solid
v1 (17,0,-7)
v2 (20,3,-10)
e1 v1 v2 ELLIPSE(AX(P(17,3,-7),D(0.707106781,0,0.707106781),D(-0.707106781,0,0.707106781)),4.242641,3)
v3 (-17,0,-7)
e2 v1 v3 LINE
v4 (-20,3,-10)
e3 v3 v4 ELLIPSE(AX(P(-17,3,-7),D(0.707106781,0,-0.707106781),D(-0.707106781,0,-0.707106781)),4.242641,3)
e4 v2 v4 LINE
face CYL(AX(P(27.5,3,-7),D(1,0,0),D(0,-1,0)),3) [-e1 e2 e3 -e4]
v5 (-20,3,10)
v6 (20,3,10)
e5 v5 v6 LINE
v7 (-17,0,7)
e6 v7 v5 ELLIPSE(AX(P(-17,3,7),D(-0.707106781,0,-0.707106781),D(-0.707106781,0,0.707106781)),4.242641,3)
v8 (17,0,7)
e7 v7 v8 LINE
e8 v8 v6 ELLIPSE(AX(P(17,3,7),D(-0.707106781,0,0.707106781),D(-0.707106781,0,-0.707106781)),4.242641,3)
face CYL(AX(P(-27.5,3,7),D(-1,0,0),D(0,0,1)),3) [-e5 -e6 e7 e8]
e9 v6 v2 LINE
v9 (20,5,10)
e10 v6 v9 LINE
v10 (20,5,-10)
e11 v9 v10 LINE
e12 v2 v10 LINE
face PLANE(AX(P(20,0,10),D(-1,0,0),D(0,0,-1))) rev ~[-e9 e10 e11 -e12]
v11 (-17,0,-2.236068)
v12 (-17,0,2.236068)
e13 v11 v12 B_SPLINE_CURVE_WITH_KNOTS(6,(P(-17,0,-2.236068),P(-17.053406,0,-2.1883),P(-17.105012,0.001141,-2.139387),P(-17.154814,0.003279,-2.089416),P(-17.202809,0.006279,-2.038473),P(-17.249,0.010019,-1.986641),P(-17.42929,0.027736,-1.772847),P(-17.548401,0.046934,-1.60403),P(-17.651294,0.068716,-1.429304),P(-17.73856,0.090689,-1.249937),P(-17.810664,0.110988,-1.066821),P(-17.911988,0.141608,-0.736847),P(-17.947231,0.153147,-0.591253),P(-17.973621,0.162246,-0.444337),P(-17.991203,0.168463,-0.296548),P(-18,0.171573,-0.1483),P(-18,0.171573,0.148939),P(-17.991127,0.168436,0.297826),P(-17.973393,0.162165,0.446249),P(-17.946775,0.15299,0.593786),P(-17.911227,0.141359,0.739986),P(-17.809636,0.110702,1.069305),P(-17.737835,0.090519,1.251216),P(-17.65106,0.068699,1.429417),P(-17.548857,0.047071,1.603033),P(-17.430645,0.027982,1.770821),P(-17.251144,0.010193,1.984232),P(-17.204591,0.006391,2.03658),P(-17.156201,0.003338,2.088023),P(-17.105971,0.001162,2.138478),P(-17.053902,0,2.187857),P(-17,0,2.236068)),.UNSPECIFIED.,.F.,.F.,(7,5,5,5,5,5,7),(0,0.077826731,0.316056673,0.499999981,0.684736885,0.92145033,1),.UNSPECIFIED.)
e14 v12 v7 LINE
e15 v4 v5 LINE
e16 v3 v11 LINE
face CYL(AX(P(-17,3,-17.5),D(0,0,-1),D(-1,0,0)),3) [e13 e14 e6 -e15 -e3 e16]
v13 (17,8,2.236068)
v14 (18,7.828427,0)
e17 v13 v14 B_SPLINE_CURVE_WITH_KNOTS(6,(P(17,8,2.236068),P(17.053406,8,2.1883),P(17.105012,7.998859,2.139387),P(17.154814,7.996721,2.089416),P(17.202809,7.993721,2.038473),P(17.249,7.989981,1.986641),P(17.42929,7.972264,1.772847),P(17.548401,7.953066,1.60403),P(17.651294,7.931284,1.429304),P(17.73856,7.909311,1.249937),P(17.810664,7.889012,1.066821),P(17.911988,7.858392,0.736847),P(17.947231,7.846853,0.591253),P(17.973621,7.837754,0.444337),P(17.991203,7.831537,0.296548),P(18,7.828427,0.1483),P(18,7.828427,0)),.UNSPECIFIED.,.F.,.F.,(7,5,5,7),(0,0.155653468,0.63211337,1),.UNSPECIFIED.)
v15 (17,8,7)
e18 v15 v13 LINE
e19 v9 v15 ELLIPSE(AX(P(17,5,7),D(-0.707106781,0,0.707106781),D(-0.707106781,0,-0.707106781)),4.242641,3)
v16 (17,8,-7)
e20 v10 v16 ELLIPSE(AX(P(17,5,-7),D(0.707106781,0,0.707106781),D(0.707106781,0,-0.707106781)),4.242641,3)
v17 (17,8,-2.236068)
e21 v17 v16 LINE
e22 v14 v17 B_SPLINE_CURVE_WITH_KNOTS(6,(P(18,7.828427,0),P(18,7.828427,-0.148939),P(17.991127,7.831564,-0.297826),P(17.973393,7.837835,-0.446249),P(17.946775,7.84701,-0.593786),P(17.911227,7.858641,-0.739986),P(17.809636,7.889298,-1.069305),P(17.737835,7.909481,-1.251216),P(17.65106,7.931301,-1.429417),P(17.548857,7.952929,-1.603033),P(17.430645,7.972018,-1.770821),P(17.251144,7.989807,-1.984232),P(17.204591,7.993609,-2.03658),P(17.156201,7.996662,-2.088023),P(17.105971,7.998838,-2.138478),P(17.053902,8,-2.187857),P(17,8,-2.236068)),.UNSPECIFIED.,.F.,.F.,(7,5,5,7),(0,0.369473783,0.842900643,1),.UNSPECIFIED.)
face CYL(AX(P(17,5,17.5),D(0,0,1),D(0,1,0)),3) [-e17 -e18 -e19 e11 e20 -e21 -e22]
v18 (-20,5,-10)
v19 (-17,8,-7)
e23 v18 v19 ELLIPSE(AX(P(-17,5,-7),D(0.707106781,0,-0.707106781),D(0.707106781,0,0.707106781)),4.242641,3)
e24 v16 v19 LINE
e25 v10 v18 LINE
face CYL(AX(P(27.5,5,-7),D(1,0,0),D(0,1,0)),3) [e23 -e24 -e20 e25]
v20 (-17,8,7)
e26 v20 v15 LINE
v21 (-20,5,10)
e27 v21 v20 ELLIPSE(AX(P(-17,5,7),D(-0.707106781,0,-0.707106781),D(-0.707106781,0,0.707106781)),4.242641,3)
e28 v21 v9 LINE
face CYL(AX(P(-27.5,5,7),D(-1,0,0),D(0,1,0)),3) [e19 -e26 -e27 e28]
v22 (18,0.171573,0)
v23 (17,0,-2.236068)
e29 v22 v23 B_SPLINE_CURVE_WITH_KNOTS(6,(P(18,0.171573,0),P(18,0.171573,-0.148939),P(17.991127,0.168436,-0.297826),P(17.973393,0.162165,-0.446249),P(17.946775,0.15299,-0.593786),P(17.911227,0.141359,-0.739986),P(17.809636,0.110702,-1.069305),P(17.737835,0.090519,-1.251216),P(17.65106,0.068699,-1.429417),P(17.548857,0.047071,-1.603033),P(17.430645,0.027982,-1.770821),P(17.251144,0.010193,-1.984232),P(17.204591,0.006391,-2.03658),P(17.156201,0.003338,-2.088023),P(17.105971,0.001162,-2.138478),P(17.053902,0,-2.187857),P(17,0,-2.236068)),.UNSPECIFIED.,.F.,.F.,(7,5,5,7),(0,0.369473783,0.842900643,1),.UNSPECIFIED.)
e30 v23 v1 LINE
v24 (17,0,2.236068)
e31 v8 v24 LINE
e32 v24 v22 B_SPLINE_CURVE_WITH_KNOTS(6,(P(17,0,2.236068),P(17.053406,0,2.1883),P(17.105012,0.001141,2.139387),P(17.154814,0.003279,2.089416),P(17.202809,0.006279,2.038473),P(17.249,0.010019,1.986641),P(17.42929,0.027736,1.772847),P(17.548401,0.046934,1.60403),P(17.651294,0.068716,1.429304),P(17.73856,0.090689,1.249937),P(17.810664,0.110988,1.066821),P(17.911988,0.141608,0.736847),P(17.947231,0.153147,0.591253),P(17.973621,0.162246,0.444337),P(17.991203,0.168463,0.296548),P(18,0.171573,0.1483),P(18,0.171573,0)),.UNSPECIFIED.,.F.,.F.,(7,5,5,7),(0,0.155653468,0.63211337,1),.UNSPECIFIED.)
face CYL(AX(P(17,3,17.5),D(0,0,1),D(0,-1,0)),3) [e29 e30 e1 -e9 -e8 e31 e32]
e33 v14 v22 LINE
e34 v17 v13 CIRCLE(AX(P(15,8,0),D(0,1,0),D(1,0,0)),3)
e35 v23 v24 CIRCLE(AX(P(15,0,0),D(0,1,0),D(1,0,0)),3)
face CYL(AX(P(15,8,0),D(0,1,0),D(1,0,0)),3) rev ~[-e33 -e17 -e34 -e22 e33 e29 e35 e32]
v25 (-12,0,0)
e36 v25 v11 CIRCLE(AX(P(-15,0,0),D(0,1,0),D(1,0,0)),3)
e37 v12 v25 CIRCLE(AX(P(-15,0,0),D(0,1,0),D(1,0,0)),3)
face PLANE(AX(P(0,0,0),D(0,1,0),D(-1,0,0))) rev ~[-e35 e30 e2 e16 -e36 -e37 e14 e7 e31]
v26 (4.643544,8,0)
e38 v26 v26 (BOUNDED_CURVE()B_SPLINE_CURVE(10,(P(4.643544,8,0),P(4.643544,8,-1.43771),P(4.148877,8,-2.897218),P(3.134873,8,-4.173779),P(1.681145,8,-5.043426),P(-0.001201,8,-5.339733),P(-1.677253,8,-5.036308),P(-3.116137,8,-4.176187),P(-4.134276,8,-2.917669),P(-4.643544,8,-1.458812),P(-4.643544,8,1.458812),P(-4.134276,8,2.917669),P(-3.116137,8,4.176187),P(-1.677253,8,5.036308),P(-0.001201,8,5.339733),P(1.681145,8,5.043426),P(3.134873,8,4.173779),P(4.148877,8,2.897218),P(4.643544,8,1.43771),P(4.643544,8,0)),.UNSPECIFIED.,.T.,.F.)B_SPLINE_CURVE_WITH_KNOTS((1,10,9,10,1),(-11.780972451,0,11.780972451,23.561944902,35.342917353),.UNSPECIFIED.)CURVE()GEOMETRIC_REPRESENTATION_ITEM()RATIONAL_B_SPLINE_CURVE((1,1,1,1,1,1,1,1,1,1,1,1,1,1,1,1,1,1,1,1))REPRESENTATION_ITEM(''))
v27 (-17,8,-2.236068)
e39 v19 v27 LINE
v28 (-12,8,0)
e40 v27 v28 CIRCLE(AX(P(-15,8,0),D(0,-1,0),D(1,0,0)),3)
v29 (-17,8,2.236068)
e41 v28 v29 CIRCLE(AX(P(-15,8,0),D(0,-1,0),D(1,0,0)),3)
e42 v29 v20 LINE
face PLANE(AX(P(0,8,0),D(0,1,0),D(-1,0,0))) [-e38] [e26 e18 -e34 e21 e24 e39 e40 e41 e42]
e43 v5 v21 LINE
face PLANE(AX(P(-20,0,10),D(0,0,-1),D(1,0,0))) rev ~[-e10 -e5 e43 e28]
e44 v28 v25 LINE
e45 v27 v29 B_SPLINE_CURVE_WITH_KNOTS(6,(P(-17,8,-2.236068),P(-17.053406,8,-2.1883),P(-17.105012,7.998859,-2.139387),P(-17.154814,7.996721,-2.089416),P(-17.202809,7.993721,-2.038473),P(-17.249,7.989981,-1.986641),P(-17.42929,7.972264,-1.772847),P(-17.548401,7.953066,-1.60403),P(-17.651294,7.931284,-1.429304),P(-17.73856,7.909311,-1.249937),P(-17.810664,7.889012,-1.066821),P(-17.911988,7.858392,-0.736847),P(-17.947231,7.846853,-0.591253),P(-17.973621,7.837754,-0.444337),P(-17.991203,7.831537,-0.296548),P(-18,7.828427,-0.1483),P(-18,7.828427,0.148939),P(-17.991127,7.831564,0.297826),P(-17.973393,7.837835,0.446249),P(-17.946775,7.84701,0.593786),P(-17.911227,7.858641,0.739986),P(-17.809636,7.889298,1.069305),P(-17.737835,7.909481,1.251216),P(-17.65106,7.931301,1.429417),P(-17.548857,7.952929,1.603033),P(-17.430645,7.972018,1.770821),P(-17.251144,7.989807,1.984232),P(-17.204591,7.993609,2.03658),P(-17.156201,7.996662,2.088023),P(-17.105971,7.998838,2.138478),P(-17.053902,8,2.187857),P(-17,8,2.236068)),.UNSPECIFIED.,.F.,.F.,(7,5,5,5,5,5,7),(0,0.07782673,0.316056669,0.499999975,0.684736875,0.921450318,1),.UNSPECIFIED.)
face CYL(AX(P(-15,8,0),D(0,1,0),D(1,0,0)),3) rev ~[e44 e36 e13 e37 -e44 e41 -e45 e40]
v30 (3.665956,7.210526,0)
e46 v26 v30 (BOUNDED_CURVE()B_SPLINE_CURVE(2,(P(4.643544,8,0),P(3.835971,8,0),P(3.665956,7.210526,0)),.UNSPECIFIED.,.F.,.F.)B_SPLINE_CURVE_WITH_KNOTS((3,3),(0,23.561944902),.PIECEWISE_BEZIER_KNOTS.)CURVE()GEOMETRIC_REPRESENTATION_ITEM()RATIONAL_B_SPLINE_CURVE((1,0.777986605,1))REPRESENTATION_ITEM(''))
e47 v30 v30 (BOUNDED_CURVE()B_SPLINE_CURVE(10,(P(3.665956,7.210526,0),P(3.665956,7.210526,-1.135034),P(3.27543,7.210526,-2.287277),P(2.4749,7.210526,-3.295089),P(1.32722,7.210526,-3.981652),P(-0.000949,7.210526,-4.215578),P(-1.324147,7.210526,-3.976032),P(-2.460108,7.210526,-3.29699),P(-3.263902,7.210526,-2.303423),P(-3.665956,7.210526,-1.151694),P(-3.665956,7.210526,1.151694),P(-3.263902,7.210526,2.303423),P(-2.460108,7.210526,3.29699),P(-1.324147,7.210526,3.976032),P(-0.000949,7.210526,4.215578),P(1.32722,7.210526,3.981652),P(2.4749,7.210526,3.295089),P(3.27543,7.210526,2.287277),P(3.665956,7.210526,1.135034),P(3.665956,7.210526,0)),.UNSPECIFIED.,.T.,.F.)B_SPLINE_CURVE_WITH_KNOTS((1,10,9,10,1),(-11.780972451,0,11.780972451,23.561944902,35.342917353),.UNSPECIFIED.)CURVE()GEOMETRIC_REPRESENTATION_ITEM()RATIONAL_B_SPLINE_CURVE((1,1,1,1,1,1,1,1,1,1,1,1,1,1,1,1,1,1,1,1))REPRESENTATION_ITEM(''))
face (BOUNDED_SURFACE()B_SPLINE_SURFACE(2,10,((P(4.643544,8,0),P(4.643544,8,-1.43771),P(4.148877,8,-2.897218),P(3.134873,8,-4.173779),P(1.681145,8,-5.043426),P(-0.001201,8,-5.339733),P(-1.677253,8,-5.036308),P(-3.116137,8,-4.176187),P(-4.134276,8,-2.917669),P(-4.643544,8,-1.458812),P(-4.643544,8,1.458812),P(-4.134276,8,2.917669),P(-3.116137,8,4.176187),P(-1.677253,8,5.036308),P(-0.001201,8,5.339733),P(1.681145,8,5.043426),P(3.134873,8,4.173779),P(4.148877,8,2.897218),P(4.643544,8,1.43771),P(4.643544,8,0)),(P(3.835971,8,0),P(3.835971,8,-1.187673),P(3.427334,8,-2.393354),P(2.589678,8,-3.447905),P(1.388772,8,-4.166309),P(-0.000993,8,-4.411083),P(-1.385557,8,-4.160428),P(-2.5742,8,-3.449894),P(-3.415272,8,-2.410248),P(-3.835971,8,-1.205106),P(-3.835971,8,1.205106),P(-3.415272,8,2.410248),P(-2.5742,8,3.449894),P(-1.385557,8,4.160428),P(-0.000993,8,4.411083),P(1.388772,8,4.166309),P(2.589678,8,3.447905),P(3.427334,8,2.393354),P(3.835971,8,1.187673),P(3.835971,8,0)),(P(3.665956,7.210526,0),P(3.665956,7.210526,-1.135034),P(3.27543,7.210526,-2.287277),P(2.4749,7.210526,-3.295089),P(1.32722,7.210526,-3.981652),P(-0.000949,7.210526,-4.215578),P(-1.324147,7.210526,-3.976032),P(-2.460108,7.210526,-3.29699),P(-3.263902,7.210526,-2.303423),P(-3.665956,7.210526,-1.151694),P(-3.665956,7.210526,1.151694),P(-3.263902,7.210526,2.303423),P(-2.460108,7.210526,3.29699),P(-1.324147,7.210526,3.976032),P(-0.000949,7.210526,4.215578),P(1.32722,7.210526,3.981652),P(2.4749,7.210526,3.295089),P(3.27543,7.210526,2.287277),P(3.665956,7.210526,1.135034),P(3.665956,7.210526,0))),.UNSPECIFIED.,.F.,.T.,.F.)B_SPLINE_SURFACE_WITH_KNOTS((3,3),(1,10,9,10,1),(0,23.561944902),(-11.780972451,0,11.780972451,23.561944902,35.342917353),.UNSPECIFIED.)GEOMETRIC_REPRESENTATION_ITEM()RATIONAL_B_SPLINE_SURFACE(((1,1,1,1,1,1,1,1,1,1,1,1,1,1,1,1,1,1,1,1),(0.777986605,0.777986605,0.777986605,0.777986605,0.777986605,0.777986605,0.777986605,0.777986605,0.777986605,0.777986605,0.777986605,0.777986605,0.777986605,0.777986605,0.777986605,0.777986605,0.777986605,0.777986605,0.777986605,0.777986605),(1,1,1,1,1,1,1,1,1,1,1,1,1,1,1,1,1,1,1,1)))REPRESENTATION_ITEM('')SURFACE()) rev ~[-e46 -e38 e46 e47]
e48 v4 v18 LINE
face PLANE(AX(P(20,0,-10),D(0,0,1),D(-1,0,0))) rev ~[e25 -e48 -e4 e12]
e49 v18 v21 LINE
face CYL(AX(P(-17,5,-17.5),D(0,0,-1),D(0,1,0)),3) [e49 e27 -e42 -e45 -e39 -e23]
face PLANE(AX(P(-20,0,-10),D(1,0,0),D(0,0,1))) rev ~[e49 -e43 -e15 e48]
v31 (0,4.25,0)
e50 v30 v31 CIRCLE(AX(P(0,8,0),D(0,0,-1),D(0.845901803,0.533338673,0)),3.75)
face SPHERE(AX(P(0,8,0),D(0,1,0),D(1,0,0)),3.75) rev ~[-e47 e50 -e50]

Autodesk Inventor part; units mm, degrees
ref_plane "YZ Plane" through (0, 0, 0) normal (1, 0, 0) x (0, 1, 0)
ref_plane "XZ Plane" through (0, 0, 0) normal (0, 1, 0) x (-1, 0, 0)
sketch "Sketch1" plane through (0, 0, 0) normal (0, 1, 0) x (-1, 0, 0)
  line L0 (-20, -10) -> (20, -10)
  line L1 (20, -10) -> (20, 10)
  line L2 (20, 10) -> (-20, 10)
  line L3 (-20, 10) -> (-20, -10)
  line L4 (-20, -10) -> (20, 10) construction
  line L5 (20, -10) -> (-20, 10) construction
  point P0 (0, 0)
  dimension "d0" = 40
  dimension "d1" = 20
extrude "Extrusion1" add sketch "Sketch1" along normal blind 8
ref_plane "Work Plane1" through (-20, 0, 0) normal (0, 0, 1) x (1, 0, 0)
sketch "Sketch3" plane through (-20, 0, 0) normal (0, 0, 1) x (1, 0, 0)
  line L0 (0, 8) -> (40, 8) projected
  line L1 (40, 8) -> (30, 8)
  circle A0 centre (20, 8) radius 3.75
  line L2 (0, 0) -> (40, 0) projected
  line L3 (20, 8) -> (20, 10)
  line L4 (20, 10) -> (16.8279, 10)
  line L5 (20, 10) -> (23.1721, 10)
  line L6 (20, 8) -> (20, 2.75)
  point P0 (20, 0)
  point P1 (20, 4.25)
  dimension "d12" = 10
  dimension "d13" = 7.5
  dimension "d14" = 8
  dimension "d15" = 20
  dimension "d16" = 2
  dimension "d17" = 5.25
revolve "Revolution3" cut sketch "Sketch3" angle 360 about axis through (0, 8, 0) along (0, 1, 0) picked at (21.3217, 5.8965) contours L3 L5 A0 L0 | L0 A0 L6
fillet "Fillet2" radius 1 1 edges at (-3.75, 8, 0)
pattern_of_one "Rectangular Pattern2"
sketch "Sketch4" plane through (0, 8, 0) normal (0, 1, 0) x (1, 0, 0)
  line L0 (-20, 10) -> (-20, -10) projected
  line L1 (-20, 0) -> (-15, 0)
  line L2 (20, -10) -> (20, 10) projected
  line L3 (20, 0) -> (15, 0)
  circle A0 centre (-15, 0) radius 3
  circle A1 centre (15, 0) radius 3
  point P0 (0, 0)
  dimension "d33" = 5
  dimension "d34" = 5
  dimension "d35" = 6
  dimension "d36" = 6
extrude "Extrusion2" cut sketch "Sketch4" against normal blind 10
fillet "Fillet3" radius 3 4 edges at (0, 8, 10) (0, 8, -10) (-20, 8, 0) (20, 8, 0)
fillet "Fillet4" radius 3 4 edges at (0, 0, 10) (-20, 0, 0) (20, 0, 0) (0, 0, -10)
properties part number "TestBearingPad"
